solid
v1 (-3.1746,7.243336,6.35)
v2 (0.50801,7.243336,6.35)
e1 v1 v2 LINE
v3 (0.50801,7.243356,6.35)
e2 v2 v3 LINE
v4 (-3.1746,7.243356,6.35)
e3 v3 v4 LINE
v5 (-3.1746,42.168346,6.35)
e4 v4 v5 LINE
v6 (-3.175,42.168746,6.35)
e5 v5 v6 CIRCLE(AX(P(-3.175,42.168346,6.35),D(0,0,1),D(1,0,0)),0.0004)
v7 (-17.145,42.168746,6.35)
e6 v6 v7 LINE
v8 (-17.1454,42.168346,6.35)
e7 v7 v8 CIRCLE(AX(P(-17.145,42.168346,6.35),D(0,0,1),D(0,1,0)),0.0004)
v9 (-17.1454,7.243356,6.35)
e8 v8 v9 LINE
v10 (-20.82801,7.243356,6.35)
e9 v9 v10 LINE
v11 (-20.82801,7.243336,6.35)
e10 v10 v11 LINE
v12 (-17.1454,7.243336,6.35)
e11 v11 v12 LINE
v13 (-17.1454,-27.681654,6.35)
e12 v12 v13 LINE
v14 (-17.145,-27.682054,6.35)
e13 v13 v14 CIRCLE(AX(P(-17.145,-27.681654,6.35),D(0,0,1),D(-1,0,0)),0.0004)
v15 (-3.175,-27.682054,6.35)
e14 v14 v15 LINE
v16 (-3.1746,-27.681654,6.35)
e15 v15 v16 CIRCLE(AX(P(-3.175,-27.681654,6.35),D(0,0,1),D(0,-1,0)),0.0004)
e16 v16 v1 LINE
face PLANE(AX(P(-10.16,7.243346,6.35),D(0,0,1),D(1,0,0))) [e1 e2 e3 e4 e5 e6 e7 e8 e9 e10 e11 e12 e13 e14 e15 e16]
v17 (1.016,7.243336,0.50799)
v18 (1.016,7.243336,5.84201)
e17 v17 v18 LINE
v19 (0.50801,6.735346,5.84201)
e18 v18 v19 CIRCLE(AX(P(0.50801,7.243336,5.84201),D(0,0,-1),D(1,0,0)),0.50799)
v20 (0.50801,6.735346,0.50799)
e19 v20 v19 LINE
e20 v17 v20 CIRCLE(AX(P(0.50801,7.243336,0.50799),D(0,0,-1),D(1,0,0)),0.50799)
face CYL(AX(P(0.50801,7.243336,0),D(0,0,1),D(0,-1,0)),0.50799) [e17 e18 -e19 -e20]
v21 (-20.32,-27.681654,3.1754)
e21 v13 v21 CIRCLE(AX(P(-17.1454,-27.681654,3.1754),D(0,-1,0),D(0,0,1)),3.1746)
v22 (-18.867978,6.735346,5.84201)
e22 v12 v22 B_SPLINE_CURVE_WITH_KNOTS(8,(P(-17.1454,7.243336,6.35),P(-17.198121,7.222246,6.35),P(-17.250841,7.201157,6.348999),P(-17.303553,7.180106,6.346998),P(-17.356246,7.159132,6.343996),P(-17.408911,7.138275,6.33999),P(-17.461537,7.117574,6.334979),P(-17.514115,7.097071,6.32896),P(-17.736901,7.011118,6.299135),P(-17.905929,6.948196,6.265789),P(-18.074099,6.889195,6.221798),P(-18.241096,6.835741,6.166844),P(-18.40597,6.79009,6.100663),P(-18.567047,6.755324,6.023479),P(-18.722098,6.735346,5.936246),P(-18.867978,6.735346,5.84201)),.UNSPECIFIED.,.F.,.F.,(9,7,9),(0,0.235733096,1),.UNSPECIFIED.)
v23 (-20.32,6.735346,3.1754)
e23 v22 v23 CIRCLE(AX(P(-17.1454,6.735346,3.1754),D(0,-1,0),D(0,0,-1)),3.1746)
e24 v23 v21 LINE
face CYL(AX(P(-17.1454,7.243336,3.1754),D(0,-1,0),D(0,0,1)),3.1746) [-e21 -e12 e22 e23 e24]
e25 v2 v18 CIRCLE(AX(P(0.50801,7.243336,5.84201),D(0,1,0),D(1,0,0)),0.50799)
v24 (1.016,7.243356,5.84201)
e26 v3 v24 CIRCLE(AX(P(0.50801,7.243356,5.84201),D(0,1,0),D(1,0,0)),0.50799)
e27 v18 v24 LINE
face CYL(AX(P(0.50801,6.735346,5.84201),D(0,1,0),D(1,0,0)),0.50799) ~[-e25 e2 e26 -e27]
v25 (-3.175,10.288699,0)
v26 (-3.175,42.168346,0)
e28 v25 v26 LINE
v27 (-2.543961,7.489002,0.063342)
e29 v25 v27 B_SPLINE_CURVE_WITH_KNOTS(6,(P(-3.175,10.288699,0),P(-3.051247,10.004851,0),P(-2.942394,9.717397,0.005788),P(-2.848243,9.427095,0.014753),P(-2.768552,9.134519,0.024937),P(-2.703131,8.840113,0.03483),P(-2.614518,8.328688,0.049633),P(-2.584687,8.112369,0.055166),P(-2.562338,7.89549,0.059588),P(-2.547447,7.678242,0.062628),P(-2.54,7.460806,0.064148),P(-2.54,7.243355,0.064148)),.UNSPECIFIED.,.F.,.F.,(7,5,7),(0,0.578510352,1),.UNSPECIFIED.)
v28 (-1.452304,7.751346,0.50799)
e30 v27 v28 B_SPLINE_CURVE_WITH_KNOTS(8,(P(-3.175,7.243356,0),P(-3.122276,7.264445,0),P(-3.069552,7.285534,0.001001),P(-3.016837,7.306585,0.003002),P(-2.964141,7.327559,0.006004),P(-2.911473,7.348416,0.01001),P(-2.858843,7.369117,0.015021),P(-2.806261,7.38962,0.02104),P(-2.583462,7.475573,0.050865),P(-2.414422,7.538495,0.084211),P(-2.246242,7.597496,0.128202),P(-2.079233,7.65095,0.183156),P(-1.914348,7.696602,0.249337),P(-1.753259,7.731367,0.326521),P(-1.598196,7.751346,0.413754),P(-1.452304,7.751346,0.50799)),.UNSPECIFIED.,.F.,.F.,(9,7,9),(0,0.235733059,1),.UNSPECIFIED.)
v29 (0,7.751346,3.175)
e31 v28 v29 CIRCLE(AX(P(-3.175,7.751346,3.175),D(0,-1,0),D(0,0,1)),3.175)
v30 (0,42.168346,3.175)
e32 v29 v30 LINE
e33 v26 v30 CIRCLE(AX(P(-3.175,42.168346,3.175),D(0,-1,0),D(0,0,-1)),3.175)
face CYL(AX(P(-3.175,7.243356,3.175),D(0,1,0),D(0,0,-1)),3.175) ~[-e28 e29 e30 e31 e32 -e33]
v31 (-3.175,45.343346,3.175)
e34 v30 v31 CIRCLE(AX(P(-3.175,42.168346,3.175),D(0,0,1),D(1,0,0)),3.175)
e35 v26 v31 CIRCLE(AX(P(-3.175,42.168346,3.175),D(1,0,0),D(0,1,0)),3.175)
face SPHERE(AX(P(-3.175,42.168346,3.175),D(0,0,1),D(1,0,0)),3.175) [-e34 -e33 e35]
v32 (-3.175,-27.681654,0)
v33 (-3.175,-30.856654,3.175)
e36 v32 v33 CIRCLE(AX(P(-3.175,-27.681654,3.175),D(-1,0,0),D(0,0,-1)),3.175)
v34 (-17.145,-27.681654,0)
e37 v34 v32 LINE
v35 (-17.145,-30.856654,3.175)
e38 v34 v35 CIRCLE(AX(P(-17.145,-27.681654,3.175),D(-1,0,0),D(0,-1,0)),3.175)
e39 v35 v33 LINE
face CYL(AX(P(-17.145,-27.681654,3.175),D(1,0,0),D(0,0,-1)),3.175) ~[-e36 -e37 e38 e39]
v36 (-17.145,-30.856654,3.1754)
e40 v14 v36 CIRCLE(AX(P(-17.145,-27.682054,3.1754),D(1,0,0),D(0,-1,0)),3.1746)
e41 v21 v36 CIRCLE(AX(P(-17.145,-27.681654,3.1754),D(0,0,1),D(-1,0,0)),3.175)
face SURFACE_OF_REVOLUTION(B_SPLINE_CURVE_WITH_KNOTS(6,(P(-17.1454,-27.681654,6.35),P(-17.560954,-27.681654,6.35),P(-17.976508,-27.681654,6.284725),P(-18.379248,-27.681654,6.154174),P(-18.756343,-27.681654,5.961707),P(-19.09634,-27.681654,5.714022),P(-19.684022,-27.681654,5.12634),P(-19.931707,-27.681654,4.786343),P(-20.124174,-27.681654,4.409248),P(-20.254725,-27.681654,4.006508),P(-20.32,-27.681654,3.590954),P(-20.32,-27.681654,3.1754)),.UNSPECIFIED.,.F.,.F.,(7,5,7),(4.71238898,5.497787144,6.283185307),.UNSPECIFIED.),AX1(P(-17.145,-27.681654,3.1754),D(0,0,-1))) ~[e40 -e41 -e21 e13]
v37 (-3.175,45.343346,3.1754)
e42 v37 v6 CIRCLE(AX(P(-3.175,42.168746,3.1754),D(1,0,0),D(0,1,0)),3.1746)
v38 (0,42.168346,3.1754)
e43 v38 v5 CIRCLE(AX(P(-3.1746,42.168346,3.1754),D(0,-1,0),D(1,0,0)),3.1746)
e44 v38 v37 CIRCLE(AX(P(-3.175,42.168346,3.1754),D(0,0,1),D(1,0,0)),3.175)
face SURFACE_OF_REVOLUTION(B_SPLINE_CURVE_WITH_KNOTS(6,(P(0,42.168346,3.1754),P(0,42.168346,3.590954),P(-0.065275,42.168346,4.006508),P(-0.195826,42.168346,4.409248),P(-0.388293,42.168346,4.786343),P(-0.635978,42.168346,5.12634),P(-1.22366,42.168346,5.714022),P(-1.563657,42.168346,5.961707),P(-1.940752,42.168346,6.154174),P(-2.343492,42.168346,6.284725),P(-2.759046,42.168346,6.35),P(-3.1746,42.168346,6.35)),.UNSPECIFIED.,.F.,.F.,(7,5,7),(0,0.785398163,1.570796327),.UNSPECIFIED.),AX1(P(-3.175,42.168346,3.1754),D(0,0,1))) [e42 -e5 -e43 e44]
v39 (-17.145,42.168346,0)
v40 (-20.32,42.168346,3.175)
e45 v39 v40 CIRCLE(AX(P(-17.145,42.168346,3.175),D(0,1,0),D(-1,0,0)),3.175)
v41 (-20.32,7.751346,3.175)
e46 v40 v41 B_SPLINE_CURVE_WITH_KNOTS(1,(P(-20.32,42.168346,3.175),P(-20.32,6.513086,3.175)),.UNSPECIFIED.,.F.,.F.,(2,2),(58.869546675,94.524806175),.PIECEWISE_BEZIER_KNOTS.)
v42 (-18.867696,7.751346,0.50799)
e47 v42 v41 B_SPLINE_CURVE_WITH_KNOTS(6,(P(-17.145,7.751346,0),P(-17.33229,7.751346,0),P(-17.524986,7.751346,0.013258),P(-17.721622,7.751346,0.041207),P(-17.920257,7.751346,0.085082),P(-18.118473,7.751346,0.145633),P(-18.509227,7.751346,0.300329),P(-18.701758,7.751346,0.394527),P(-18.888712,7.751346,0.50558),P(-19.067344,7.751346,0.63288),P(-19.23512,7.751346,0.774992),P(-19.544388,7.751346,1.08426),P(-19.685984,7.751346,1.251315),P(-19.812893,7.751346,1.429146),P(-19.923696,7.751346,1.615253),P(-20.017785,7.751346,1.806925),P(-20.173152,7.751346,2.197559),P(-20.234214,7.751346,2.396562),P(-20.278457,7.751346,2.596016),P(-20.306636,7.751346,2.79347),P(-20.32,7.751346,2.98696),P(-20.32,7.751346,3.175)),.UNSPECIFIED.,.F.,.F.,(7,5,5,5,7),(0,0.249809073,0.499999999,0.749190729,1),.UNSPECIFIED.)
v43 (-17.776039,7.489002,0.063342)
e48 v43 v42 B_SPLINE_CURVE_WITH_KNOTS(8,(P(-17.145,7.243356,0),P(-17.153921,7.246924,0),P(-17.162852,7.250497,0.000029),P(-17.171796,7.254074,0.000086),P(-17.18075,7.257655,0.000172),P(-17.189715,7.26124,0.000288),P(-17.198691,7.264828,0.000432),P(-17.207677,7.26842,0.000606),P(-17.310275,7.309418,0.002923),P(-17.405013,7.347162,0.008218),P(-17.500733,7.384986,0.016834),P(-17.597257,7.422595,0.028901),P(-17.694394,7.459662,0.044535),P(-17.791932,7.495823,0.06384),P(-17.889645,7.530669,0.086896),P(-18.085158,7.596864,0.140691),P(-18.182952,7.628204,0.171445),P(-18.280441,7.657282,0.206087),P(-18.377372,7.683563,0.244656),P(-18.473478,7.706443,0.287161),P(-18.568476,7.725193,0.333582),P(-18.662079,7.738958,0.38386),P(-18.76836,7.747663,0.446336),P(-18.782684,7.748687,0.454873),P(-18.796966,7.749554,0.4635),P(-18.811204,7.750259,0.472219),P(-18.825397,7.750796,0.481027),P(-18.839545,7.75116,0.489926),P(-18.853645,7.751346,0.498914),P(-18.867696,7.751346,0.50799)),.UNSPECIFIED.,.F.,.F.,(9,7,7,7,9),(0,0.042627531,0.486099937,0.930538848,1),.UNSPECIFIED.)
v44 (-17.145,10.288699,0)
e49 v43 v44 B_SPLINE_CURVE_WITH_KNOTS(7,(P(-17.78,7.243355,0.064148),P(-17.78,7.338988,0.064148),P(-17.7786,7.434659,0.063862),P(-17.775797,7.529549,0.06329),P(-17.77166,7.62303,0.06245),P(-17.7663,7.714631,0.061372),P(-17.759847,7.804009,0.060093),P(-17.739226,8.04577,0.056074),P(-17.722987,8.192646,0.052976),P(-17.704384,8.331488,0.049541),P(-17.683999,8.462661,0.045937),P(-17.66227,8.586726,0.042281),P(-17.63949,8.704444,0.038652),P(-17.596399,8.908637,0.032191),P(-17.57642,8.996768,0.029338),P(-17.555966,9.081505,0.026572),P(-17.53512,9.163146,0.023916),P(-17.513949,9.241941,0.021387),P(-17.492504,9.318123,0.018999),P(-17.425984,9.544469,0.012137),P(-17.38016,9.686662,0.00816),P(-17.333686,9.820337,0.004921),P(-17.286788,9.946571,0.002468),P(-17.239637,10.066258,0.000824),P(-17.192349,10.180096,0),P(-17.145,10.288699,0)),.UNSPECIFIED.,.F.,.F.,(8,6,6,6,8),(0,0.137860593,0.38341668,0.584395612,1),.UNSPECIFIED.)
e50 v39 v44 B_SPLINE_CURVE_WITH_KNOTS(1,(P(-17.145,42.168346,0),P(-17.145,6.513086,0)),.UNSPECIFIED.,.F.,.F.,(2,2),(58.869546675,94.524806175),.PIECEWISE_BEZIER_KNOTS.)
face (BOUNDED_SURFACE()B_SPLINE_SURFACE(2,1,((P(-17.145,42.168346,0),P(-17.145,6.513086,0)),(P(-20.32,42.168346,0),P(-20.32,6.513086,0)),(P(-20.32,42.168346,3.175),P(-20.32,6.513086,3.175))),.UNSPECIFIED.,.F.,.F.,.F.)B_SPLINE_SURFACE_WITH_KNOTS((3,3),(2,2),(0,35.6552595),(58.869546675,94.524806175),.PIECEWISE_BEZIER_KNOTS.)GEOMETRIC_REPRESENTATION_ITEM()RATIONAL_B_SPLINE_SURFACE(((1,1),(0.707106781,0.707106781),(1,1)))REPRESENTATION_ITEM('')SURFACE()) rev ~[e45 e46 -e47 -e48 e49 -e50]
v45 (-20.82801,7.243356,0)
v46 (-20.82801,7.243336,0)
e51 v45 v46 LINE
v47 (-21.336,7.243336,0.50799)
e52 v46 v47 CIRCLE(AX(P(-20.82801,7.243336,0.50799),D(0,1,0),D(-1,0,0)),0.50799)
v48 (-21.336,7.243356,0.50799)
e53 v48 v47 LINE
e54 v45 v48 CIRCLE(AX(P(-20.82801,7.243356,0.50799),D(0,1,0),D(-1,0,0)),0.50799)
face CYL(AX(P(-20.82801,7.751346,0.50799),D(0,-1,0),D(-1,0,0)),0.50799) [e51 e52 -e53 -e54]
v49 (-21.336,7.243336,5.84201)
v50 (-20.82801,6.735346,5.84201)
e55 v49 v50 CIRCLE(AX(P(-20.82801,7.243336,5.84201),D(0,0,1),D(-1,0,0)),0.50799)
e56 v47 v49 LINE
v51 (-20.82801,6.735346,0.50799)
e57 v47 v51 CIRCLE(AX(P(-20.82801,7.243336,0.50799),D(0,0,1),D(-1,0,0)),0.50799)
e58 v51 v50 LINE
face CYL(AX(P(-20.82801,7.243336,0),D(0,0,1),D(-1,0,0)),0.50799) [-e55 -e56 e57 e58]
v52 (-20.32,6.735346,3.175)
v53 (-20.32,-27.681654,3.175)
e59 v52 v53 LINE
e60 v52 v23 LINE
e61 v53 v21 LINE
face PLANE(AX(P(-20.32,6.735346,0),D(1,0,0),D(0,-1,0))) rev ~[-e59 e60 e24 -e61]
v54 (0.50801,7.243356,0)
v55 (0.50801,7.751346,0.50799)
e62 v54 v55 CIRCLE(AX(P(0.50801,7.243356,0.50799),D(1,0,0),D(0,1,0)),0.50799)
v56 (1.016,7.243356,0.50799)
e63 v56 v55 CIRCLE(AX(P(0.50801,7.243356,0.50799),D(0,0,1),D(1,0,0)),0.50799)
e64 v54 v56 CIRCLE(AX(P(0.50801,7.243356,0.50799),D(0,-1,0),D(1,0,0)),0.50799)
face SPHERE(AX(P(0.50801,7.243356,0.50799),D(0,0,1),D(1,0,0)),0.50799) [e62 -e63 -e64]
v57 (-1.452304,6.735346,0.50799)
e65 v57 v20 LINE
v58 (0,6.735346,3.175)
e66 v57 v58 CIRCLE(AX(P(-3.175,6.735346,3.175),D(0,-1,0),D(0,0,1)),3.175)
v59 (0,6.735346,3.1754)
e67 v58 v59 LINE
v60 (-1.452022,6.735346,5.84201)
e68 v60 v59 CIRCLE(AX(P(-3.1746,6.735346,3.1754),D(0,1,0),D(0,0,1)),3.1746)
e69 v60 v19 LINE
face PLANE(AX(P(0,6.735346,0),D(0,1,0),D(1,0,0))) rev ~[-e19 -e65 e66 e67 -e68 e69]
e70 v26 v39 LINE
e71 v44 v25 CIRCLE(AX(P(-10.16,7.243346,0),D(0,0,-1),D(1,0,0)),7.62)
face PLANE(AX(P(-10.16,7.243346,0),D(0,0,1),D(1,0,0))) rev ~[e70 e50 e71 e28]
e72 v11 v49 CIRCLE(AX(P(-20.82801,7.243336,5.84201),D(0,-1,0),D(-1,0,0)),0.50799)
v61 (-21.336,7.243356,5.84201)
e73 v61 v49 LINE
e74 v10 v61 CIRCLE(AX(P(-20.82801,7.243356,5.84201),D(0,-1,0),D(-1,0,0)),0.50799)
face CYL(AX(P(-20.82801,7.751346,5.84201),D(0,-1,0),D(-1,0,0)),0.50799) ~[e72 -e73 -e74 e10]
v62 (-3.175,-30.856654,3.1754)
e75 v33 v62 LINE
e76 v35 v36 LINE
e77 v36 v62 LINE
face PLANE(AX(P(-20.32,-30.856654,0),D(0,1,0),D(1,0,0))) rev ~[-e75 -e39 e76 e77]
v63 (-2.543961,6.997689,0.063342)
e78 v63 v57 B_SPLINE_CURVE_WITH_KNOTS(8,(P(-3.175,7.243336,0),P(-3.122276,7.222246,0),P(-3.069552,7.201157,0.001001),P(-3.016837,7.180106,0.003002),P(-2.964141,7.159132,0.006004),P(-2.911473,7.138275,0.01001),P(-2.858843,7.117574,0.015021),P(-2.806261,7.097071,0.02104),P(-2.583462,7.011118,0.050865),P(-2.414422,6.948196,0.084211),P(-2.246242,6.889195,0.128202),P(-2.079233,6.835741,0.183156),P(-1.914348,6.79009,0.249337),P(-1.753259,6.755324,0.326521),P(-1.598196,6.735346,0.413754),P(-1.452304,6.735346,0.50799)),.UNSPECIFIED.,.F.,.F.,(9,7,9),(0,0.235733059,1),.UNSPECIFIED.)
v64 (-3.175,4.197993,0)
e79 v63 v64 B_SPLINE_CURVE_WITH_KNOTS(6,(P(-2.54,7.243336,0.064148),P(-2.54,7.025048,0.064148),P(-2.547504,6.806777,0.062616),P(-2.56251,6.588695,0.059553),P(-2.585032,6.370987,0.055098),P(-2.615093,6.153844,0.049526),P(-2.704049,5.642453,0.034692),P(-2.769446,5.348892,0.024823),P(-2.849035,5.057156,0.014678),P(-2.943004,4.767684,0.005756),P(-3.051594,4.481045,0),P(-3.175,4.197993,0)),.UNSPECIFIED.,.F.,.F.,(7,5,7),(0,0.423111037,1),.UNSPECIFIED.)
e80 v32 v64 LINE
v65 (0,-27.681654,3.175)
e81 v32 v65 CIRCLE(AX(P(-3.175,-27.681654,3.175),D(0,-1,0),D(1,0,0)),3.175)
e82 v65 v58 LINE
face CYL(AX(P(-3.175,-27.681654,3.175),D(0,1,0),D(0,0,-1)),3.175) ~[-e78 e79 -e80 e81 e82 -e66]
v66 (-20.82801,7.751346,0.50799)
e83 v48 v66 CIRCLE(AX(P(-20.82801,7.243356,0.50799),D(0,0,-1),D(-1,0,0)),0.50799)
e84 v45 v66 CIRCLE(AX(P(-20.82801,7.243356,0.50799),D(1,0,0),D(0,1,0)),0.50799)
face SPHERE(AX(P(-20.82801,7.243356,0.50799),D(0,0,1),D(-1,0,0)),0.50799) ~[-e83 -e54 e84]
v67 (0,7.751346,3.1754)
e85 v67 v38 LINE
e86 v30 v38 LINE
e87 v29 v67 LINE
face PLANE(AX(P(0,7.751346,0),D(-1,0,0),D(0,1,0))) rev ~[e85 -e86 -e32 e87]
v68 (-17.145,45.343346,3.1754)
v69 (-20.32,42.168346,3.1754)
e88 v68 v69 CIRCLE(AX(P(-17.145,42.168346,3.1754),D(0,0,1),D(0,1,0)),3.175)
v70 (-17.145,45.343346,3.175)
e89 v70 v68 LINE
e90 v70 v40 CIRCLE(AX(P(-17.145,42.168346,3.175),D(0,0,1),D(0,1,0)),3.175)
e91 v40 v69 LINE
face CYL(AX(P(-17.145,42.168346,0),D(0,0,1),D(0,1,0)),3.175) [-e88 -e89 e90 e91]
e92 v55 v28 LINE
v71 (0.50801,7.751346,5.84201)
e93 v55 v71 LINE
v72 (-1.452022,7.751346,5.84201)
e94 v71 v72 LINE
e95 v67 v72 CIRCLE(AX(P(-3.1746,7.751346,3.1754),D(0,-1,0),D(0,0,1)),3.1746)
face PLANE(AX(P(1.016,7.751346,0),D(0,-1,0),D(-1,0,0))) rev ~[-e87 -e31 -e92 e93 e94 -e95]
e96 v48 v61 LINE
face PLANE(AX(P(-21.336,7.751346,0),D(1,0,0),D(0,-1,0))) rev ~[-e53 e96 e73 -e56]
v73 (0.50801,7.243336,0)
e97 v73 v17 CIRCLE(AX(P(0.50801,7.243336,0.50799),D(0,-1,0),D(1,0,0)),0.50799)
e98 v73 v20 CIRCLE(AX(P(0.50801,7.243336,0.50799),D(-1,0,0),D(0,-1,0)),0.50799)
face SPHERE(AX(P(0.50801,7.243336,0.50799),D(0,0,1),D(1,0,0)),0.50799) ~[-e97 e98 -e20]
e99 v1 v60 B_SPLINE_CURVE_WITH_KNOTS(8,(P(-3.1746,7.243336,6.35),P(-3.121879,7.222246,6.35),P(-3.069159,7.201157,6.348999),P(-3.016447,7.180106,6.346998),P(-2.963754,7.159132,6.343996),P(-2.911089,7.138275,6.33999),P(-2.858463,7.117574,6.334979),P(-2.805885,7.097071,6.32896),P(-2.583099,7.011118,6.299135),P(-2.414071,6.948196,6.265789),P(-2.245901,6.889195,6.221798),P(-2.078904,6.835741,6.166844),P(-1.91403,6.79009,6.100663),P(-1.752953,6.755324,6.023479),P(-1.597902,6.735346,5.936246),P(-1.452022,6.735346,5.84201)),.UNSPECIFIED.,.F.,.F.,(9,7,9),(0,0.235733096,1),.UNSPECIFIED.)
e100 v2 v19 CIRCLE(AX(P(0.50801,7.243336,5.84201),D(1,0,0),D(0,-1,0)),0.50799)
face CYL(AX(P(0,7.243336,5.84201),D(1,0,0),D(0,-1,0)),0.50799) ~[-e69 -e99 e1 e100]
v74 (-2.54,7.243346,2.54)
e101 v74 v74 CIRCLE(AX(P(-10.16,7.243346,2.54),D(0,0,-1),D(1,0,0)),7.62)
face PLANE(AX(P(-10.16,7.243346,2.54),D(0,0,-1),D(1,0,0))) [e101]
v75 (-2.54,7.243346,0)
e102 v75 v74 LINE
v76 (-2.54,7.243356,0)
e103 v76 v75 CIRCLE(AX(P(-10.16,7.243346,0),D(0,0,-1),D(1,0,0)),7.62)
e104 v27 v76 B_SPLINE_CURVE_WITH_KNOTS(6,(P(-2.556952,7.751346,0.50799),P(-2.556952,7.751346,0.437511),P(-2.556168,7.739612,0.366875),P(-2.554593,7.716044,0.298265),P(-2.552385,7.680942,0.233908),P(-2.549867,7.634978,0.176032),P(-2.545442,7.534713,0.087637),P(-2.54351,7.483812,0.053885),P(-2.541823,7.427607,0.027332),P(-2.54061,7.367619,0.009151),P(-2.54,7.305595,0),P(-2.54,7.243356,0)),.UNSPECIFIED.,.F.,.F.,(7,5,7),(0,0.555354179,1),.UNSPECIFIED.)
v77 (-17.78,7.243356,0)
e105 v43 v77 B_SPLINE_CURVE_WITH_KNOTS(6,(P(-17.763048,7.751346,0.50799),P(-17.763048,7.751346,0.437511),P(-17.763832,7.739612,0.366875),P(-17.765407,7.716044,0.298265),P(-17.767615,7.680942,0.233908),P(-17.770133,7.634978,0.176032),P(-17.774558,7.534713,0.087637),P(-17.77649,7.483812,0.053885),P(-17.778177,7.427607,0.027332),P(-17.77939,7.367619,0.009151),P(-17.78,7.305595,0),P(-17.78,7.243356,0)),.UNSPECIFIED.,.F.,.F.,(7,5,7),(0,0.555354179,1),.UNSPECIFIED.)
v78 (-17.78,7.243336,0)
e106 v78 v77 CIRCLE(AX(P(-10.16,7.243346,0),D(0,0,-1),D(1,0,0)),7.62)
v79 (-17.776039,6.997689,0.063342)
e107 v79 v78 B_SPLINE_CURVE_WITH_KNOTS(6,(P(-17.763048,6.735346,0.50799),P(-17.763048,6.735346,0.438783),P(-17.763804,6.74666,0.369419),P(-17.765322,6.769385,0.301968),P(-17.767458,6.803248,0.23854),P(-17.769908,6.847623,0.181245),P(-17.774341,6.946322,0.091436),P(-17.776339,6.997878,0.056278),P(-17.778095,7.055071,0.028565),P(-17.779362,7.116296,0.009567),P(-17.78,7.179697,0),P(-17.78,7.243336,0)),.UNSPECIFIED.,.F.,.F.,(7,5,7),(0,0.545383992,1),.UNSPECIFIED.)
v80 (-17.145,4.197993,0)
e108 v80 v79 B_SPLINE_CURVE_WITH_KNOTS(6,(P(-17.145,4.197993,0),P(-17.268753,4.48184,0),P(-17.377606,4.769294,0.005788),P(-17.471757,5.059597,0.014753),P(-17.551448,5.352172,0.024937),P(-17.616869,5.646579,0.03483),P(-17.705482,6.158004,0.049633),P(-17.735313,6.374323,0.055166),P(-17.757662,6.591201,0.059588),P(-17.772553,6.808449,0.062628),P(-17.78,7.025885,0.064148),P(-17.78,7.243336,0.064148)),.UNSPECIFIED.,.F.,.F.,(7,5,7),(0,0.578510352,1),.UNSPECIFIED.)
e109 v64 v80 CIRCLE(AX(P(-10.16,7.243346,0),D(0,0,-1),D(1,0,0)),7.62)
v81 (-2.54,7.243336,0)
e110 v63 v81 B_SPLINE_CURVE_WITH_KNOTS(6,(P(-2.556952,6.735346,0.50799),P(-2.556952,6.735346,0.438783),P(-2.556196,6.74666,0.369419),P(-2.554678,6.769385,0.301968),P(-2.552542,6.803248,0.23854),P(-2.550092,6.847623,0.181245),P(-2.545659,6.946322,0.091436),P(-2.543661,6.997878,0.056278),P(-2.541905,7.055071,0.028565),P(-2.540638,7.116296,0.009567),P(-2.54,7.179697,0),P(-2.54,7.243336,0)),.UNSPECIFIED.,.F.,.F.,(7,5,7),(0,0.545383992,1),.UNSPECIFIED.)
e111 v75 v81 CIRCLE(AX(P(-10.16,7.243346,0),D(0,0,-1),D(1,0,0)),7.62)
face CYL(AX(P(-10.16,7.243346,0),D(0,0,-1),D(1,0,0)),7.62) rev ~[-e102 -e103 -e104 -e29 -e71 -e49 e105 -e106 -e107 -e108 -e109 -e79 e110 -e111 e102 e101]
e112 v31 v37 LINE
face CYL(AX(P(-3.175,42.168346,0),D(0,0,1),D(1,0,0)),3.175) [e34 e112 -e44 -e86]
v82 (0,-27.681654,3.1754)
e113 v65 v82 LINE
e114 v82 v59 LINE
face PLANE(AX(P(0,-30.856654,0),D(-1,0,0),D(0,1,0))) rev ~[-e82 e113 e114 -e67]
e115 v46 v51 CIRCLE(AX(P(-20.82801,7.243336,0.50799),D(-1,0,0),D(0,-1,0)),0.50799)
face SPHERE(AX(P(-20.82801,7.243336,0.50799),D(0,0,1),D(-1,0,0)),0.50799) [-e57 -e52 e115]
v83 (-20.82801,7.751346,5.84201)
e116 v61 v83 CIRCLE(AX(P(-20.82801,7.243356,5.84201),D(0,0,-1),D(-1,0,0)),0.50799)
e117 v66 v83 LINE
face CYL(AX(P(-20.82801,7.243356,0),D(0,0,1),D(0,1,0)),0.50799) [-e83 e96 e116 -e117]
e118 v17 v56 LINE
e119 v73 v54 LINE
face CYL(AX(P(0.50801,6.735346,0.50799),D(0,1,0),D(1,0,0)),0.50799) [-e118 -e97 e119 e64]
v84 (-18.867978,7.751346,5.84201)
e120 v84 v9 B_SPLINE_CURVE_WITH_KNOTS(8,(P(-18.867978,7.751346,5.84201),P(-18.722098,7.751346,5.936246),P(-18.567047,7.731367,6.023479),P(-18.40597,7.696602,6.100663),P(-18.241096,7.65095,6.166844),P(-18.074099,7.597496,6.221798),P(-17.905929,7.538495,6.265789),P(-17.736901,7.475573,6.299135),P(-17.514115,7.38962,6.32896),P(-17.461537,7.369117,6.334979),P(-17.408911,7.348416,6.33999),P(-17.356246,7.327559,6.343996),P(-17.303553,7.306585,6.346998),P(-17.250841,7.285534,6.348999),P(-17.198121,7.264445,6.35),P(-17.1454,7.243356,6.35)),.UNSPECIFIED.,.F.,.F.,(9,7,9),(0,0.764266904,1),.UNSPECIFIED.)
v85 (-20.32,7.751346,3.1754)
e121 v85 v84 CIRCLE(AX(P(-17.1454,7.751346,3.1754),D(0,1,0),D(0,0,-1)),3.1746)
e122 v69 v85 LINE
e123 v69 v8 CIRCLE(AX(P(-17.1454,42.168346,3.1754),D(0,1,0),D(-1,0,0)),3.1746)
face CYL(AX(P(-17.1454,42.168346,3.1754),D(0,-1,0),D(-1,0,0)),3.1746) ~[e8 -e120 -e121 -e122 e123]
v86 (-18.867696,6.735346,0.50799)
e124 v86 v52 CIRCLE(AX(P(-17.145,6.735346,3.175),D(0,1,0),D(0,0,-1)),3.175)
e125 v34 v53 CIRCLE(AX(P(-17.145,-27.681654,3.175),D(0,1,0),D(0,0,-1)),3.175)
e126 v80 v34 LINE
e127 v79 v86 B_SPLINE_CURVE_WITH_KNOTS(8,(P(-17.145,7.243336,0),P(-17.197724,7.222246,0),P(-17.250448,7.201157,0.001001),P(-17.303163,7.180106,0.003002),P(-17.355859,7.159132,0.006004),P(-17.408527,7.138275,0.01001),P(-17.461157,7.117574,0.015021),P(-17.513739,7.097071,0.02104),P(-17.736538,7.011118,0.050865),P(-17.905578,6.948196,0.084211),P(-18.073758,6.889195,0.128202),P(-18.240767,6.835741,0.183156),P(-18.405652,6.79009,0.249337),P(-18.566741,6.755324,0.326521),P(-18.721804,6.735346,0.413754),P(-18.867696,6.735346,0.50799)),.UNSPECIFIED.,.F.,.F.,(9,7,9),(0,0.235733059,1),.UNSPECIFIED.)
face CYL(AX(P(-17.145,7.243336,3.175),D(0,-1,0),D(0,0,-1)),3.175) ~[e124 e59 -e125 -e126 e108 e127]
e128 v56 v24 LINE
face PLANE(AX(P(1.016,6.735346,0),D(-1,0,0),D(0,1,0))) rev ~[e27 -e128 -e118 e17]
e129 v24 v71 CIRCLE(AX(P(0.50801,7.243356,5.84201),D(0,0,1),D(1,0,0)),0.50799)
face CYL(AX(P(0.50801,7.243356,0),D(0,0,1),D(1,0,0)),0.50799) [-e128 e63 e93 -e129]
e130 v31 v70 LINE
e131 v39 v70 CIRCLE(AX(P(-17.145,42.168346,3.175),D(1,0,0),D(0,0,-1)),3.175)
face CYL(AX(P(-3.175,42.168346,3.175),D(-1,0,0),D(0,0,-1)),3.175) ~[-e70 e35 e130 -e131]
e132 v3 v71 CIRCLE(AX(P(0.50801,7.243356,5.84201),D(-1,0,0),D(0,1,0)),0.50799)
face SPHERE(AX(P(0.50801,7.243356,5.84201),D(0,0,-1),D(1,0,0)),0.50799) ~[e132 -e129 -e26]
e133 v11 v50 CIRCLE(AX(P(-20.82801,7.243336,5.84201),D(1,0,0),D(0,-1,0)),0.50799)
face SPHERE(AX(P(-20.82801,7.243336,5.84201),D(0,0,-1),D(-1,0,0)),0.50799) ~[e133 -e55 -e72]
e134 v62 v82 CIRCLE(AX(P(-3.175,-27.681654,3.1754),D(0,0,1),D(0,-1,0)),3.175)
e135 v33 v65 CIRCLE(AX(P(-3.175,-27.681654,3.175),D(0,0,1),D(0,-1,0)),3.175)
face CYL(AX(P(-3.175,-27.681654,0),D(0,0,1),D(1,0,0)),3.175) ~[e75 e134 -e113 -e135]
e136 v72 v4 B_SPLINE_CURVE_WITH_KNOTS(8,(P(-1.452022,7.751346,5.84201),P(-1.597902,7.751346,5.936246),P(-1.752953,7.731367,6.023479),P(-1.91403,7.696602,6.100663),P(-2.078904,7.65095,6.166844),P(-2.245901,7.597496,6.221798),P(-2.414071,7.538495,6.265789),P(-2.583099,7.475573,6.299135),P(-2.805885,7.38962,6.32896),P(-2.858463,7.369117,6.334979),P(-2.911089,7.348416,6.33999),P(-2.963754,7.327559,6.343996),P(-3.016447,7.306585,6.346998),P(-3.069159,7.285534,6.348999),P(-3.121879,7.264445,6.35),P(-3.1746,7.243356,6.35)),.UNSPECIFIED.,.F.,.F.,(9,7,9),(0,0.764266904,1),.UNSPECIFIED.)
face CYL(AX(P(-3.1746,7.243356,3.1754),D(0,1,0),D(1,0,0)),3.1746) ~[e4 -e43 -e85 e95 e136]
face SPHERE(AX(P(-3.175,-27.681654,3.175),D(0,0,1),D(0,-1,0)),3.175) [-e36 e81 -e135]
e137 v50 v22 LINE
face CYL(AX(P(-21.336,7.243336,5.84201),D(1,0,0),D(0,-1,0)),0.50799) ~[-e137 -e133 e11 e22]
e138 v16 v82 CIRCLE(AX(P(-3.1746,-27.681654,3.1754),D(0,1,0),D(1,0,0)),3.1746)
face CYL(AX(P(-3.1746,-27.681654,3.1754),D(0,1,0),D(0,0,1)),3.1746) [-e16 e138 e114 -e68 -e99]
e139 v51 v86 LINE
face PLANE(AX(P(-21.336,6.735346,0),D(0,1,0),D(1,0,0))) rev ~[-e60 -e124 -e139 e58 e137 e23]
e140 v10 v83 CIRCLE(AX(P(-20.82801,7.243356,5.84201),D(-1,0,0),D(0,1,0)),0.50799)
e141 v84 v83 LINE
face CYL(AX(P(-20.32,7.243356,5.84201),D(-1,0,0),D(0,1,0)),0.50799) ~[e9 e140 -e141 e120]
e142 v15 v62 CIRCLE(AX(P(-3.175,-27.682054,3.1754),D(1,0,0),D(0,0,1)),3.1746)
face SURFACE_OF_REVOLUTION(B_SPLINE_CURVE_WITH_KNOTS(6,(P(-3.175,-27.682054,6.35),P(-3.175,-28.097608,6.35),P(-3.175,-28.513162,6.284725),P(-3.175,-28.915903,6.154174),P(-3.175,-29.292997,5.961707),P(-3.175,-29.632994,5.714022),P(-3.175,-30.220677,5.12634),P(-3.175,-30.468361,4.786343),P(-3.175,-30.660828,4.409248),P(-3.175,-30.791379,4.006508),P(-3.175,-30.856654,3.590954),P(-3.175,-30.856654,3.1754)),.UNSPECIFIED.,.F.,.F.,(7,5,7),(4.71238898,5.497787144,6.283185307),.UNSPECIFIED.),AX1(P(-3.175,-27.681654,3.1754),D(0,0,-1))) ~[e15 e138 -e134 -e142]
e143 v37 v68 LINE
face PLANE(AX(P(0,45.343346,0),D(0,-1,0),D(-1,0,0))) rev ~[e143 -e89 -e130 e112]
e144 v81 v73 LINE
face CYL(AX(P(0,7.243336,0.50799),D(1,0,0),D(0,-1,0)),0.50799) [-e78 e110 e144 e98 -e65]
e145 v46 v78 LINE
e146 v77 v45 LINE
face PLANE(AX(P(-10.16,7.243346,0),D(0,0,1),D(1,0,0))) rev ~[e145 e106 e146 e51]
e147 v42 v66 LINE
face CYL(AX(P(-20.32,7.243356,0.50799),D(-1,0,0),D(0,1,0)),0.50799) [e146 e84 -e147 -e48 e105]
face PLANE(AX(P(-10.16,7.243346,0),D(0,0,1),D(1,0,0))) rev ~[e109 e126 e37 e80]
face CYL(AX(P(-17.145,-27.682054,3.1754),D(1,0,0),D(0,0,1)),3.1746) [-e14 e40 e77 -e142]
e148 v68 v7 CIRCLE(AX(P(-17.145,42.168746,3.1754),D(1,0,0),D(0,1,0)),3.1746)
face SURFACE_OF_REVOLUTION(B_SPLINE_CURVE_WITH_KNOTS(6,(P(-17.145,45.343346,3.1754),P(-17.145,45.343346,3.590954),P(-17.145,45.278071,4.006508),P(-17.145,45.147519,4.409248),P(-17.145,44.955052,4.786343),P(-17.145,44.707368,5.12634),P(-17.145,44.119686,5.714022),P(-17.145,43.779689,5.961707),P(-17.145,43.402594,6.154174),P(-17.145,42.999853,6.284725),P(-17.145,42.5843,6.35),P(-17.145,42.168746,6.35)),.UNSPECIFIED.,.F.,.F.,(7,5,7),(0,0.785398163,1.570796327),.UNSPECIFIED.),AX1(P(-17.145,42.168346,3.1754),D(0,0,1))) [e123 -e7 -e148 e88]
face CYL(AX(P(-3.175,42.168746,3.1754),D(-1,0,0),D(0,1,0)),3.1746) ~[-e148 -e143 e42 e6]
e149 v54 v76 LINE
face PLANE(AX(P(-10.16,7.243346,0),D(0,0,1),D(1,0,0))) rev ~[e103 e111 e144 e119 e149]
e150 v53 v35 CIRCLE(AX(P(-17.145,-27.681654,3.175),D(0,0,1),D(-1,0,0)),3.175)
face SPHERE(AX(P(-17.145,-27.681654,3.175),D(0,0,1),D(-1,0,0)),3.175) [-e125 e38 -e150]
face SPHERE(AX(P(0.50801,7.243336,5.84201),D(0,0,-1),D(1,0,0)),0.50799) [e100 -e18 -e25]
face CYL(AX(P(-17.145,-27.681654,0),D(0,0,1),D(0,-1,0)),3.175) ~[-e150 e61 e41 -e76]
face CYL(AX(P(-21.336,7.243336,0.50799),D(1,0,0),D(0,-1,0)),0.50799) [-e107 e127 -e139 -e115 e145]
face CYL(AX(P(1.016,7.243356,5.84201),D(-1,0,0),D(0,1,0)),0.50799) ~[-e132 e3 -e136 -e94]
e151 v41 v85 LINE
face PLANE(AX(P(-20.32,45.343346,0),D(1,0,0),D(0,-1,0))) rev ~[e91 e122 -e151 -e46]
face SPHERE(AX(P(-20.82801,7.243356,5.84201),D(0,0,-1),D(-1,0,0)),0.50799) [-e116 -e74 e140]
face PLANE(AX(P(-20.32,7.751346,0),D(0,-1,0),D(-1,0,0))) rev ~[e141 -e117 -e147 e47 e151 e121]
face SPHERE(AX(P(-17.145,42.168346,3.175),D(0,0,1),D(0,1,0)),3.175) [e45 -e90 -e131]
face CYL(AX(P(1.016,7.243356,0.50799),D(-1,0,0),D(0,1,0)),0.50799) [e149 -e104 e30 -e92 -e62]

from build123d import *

# Parameters (mm, degrees)
F1_DEPTH = 6.35
F2_R     = 0.50799
F3_F1_R  = 3.175
F3_F2_R  = 3.175
F3_F3_R  = 3.175
F3_F4_R  = 3.175
F3_F5_R  = 3.175
F3_F6_R  = 3.175
F3_F7_R  = 3.1746
F3_F8_R  = 3.1746
F4_R     = 7.62
F5_DEPTH = 2.54


# Not quite as in the source:
# - a fillet or chamfer is up to 0.001 mm smaller than in the source, because OpenCascade refuses the exact size


with BuildPart() as f1:
    # F0 (on Top) → F1 (new body)
    with BuildSketch(Plane.XY):
        Polygon((0, 7.7513456765), (0, 45.3433456765), (-20.32, 45.3433456765), (-20.32, 7.7513456765), (-21.336, 7.7513456765), (-21.336, 6.7353456765), (-20.32, 6.7353456765), (-20.32, -30.8566543235), (0, -30.8566543235), (0, 6.7353456765), (1.016, 6.7353456765), (1.016, 7.7513456765), align=None)
    extrude(amount=F1_DEPTH)

    # F2 (radius 0.508 in the source; OpenCascade refuses exactly that, so slightly less here)
    f2_edges = [f1.edges().sort_by_distance(p)[0] for p in [
        (1.016, 6.735346, 3.175),
        (1.016, 7.751346, 3.175),
        (1.016, 7.243346, 0),
        (1.016, 7.243346, 6.35),
        (0.508, 7.751346, 6.35),
        (0.508, 6.735346, 6.35),
        (0.508, 6.735346, 0),
        (0.508, 7.751346, 0),
        (-21.336, 7.751346, 3.175),
        (-21.336, 6.735346, 3.175),
        (-21.336, 7.243346, 0),
        (-21.336, 7.243346, 6.35),
        (-20.828, 7.751346, 6.35),
        (-20.828, 6.735346, 6.35),
        (-20.828, 7.751346, 0),
        (-20.828, 6.735346, 0),
    ]]
    fillet(f2_edges, radius=F2_R)

    # F3: fillet of radius 3.175 on 16 edges, made by hand

    # F3_f1
    f3_f1_edges = [f1.edges().sort_by_distance(p)[0] for p in [
        (0, -30.8566543235, 3.175),
    ]]
    fillet(f3_f1_edges, radius=F3_F1_R)

    # F3_f2
    f3_f2_edges = [f1.edges().sort_by_distance(p)[0] for p in [
        (-20.32, -30.8566543235, 3.175),
    ]]
    fillet(f3_f2_edges, radius=F3_F2_R)

    # F3_f3
    f3_f3_edges = [f1.edges().sort_by_distance(p)[0] for p in [
        (0, 45.3433456765, 3.175),
    ]]
    fillet(f3_f3_edges, radius=F3_F3_R)

    # F3_f4
    f3_f4_edges = [f1.edges().sort_by_distance(p)[0] for p in [
        (-20.32, 45.3433456765, 3.175),
    ]]
    fillet(f3_f4_edges, radius=F3_F4_R)

    # F3_f5
    f3_f5_edges = [f1.edges().sort_by_distance(p)[0] for p in [
        (-10.16, -30.8566543235, 0),
    ]]
    fillet(f3_f5_edges, radius=F3_F5_R)

    # F3_f6
    f3_f6_edges = [f1.edges().sort_by_distance(p)[0] for p in [
        (-10.16, 45.3433456765, 0),
    ]]
    fillet(f3_f6_edges, radius=F3_F6_R)

    # F3_f7 (radius 3.175 in the source; OpenCascade refuses exactly that, so slightly less here)
    f3_f7_edges = [f1.edges().sort_by_distance(p)[0] for p in [
        (-10.16, 45.3433456765, 6.35),
    ]]
    fillet(f3_f7_edges, radius=F3_F7_R)

    # F3_f8 (radius 3.175 in the source; OpenCascade refuses exactly that, so slightly less here)
    f3_f8_edges = [f1.edges().sort_by_distance(p)[0] for p in [
        (-10.16, -30.8566543235, 6.35),
    ]]
    fillet(f3_f8_edges, radius=F3_F8_R)

    # F4 (on face) → F5 (cut)
    with BuildSketch(Plane(origin=(0, 0, 0), x_dir=(1, 0, 0), z_dir=(0, 0, -1))):
        with Locations((-10.16, -7.2433456765)):
            Circle(F4_R)
    extrude(amount=-F5_DEPTH, mode=Mode.SUBTRACT)


solid = f1.part
